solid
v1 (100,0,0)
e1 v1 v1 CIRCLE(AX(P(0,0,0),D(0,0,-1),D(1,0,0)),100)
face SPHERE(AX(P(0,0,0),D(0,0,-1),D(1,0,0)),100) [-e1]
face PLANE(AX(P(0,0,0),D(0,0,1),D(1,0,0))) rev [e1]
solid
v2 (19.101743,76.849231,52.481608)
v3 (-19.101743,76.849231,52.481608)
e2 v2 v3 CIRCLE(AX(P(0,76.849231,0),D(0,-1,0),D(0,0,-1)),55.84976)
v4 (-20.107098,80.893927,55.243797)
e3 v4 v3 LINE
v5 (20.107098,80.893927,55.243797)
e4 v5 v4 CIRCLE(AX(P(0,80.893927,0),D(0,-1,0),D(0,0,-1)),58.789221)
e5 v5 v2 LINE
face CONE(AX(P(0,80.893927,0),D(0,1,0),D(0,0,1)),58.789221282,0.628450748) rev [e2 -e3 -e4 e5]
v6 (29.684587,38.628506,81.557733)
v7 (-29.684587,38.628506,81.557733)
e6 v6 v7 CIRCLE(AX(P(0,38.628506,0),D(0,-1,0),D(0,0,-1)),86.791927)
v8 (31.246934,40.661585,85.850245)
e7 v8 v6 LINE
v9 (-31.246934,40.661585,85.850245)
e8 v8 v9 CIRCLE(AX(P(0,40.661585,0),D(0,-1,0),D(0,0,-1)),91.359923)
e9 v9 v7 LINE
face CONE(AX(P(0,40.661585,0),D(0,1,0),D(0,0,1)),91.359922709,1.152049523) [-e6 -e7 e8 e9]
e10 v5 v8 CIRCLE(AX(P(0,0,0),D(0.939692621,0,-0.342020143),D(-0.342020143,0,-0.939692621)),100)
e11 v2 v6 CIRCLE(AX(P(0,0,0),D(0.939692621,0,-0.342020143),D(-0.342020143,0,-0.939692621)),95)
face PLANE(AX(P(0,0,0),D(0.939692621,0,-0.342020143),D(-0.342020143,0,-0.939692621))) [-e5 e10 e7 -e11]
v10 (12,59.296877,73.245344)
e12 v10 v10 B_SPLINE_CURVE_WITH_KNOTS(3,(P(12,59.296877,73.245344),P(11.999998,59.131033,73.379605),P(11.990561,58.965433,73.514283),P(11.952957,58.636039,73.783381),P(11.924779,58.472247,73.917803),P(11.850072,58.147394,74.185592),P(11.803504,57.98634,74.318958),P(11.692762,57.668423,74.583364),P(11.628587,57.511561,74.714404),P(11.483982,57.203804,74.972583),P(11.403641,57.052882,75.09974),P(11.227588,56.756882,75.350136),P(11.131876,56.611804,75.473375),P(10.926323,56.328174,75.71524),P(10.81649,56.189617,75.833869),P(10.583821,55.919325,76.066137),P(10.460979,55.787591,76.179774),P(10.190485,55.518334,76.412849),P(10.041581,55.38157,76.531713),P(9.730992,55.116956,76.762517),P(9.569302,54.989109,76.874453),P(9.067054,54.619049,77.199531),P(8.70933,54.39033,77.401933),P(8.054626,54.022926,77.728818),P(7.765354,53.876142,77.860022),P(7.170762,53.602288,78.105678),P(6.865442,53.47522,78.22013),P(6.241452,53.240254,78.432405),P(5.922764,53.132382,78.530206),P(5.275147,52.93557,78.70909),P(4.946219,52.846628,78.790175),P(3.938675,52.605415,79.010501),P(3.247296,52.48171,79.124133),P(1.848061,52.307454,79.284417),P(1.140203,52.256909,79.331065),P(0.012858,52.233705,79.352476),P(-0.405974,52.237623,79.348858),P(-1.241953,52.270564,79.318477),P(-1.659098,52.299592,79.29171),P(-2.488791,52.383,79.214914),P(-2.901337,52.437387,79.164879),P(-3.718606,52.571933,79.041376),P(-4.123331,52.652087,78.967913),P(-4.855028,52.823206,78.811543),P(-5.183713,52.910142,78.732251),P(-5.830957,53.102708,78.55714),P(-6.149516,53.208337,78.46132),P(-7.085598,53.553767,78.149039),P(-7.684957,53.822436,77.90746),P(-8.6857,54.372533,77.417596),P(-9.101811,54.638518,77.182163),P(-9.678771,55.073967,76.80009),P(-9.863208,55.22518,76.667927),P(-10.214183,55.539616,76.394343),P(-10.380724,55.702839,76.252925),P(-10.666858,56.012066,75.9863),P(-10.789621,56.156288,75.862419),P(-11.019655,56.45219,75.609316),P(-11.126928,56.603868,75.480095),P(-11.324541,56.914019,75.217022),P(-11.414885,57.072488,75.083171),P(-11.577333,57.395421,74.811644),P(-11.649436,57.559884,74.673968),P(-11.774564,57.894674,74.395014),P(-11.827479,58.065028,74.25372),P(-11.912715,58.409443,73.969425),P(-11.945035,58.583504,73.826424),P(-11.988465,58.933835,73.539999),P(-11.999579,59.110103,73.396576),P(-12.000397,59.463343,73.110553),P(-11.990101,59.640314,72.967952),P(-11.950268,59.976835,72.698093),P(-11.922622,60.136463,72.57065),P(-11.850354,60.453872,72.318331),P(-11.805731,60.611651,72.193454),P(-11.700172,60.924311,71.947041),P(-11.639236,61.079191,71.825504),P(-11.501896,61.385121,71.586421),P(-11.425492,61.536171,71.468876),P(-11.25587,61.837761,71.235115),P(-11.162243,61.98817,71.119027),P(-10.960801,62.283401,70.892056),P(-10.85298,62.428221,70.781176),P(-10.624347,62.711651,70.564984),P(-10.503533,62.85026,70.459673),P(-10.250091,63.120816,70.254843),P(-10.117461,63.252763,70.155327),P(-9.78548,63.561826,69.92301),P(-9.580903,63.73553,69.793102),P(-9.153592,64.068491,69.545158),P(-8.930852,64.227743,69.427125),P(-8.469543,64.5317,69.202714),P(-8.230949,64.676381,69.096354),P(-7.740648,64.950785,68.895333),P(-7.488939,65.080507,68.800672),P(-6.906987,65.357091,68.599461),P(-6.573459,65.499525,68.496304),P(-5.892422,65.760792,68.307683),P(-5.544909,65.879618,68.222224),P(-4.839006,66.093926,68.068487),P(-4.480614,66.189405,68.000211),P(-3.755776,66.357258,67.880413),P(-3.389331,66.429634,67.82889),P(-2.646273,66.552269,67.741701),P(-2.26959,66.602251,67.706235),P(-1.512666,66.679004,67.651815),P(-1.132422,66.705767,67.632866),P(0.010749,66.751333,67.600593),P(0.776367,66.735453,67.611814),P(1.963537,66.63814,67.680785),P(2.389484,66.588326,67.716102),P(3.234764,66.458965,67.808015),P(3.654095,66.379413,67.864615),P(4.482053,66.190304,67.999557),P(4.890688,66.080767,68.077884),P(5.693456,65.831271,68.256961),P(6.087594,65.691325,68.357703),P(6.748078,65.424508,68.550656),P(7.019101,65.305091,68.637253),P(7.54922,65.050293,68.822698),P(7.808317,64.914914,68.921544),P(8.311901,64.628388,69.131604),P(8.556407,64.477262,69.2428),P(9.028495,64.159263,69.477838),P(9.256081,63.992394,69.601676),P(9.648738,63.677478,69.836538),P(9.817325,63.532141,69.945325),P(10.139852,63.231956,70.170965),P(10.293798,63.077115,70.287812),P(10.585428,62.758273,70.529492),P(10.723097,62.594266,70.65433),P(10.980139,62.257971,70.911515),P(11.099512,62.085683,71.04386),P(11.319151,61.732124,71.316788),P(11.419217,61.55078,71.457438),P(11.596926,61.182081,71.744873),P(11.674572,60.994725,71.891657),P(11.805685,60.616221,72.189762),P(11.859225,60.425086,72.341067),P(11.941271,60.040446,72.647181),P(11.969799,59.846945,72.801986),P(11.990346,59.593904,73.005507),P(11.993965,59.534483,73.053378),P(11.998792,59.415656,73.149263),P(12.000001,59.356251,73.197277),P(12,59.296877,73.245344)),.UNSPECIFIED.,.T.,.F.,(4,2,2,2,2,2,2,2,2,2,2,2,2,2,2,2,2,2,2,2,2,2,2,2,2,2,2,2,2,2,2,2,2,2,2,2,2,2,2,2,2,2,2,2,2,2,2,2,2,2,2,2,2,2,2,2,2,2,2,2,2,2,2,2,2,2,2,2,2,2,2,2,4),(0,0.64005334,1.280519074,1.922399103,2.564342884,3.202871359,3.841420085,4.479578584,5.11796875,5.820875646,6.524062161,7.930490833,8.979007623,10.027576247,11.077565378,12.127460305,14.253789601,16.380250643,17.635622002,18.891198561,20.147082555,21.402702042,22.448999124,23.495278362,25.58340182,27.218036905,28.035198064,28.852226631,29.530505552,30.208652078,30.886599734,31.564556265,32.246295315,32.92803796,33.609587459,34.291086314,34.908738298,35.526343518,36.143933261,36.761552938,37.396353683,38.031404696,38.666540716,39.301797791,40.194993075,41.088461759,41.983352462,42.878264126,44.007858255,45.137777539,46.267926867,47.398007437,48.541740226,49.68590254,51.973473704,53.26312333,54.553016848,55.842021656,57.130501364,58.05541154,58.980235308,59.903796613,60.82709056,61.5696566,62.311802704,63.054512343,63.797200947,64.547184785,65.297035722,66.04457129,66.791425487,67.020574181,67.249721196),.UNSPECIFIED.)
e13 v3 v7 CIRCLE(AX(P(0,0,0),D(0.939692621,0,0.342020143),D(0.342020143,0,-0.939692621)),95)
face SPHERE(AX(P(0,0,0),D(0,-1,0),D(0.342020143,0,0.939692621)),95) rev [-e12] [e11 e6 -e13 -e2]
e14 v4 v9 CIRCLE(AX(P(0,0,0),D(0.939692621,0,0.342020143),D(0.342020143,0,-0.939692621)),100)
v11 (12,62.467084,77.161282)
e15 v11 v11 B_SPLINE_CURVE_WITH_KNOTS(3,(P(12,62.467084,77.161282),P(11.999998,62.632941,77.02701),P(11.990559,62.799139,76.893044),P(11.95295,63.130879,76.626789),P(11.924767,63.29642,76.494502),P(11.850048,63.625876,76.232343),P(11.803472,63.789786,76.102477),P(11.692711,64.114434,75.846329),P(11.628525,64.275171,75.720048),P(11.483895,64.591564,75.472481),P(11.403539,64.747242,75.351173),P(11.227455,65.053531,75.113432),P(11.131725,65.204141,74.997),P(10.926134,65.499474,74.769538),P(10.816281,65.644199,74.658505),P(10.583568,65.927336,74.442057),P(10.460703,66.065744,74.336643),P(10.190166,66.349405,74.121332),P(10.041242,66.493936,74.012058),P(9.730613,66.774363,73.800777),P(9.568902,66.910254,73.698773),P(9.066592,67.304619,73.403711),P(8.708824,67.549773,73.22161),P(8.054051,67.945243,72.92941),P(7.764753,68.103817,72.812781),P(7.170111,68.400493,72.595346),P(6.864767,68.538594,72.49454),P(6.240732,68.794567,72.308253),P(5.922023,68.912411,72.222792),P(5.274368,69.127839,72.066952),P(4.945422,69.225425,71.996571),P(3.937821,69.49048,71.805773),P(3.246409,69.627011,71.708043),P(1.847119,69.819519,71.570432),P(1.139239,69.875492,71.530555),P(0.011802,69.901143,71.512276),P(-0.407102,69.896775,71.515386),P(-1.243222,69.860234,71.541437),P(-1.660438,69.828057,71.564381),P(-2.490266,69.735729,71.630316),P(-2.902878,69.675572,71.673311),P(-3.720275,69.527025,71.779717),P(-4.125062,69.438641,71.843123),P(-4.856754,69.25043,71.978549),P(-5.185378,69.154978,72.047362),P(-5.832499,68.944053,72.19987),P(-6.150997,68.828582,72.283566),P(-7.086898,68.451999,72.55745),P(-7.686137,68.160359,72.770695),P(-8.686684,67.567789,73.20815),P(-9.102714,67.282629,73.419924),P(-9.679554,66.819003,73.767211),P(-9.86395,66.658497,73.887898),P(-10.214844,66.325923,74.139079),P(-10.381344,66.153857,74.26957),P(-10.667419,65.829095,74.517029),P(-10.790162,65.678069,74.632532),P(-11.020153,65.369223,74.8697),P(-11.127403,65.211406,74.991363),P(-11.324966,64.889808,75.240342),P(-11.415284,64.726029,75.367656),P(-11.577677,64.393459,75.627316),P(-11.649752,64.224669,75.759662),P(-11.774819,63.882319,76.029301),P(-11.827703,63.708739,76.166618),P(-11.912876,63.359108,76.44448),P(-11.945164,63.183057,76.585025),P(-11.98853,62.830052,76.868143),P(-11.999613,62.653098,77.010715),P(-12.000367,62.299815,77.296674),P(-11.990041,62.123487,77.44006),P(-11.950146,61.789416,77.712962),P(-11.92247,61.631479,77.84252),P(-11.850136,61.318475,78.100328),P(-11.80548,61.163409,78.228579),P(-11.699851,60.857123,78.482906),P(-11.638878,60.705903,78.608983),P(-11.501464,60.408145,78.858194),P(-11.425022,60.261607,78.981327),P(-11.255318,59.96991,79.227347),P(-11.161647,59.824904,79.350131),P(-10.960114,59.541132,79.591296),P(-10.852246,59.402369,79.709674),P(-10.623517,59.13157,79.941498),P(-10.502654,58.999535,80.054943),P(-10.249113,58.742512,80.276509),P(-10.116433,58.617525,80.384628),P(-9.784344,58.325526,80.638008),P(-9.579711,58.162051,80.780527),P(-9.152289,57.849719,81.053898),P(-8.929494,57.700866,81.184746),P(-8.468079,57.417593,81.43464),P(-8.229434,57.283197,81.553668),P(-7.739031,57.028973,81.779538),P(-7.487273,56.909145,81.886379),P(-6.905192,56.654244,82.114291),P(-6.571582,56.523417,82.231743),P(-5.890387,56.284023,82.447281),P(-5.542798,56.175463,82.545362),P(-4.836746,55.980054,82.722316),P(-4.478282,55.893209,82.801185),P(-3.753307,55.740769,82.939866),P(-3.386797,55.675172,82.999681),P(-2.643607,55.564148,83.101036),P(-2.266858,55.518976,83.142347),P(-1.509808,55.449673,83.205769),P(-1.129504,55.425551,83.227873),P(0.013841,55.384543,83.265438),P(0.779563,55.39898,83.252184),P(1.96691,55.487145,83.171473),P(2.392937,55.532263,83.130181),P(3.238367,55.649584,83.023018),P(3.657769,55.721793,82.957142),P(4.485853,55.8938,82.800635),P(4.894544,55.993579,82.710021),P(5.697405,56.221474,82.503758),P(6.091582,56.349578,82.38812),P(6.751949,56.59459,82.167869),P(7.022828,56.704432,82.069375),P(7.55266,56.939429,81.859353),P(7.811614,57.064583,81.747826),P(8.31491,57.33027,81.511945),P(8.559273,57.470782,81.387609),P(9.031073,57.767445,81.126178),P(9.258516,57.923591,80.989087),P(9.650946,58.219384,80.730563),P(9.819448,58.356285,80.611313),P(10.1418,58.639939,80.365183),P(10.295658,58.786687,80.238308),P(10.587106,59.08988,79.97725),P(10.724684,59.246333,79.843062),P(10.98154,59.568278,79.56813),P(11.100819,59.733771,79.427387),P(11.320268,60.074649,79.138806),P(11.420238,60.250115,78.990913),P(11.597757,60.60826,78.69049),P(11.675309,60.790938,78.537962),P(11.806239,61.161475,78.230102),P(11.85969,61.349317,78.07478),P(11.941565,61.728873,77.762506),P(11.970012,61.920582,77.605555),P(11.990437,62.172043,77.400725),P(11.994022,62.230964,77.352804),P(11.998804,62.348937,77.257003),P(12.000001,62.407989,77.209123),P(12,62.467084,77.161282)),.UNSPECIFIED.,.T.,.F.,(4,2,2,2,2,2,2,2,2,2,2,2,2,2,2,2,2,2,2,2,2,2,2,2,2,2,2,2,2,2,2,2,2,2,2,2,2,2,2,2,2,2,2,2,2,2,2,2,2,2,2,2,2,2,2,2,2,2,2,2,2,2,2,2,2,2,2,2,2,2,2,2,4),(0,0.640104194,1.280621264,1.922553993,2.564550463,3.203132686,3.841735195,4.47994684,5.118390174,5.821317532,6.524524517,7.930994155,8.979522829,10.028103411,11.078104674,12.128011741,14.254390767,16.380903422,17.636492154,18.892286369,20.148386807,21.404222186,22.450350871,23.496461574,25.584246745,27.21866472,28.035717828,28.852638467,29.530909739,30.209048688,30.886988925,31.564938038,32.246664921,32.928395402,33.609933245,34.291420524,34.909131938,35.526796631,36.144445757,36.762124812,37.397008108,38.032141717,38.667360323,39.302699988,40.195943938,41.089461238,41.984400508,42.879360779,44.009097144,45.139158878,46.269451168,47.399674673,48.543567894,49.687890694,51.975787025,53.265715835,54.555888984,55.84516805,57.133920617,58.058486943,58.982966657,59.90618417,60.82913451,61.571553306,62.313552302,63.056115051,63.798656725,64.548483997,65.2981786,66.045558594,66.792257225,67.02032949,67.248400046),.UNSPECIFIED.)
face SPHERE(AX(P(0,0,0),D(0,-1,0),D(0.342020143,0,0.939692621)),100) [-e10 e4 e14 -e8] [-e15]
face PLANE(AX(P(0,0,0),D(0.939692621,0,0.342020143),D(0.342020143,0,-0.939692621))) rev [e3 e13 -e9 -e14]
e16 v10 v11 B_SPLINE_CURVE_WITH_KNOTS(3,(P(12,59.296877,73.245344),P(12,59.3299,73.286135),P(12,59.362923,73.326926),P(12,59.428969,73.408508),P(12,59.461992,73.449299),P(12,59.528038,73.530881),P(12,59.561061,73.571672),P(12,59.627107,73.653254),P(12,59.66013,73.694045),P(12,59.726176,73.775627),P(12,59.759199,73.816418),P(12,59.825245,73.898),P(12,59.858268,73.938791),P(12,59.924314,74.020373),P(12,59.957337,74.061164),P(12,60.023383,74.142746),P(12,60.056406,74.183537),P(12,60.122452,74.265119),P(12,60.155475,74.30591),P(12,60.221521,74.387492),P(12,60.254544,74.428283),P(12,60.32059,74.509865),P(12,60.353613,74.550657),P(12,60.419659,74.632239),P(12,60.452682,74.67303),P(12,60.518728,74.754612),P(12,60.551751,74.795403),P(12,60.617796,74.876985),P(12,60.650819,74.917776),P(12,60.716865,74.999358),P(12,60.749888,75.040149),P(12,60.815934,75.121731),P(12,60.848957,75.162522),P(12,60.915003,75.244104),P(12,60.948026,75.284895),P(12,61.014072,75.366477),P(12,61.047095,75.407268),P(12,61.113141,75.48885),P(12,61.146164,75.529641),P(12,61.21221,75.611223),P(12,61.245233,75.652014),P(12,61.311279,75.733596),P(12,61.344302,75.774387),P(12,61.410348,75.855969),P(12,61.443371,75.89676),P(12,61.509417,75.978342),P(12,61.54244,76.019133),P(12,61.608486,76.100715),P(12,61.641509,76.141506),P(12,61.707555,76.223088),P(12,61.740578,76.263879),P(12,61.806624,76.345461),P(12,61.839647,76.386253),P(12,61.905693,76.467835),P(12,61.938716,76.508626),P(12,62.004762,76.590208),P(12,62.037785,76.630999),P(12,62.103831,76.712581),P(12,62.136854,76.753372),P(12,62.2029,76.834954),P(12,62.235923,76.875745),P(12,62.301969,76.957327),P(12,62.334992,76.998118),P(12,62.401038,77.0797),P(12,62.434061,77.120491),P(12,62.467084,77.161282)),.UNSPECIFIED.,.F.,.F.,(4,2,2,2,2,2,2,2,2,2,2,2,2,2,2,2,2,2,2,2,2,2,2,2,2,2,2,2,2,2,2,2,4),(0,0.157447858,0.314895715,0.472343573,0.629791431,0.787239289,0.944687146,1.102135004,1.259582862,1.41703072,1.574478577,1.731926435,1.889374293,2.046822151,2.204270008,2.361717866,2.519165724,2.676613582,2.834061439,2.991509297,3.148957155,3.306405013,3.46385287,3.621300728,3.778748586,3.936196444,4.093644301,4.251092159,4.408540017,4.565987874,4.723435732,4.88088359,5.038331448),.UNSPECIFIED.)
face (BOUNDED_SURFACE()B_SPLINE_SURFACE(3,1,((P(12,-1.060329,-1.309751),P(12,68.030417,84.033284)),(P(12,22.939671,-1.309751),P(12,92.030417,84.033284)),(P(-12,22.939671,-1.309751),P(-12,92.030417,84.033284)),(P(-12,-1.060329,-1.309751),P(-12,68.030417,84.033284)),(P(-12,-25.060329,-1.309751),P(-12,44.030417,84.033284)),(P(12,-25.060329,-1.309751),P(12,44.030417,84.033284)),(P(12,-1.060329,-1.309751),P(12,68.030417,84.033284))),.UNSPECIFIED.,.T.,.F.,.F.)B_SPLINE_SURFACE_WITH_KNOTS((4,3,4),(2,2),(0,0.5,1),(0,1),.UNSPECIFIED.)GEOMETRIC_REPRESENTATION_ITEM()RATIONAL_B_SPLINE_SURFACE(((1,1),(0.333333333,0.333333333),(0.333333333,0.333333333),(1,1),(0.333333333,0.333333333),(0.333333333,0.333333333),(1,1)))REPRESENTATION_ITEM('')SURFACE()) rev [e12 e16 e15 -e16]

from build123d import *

# Parameters (mm, degrees)
REVOLVE_2_ANGLE           = 180
REVOLVE_3_ANGLE           = 20
REVOLVE_3_OTHER_WAY_ANGLE = 20
SWEEP_START               = 94.23905762
SWEEP_1_DEPTH             = 5.76094238


# Read off the part's stored shape, not the designer's step: Вырез-По траектории1
with BuildPart() as part:
    # Эскиз1 → Повернуть2 (revolve)
    with BuildSketch(Plane.XY):
        with BuildLine():
            Line((0, 100), (0, -100))
            ThreePointArc((0, -100), (100, 0), (0, 100))
        make_face()
    revolve(axis=Axis((0, 100, 0), (0, -1, 0)), revolution_arc=REVOLVE_2_ANGLE)


with BuildPart() as body_2:
    # Эскиз2 → Повернуть3 (revolve)
    with BuildSketch(Plane(origin=(0, 0, 0), x_dir=(0, 0, -1), z_dir=(1, 0, 0))):
        with BuildLine():
            Line((-91.359922709, 40.661585344), (-86.791926573, 38.628506077))
            ThreePointArc((-86.791926573, 38.628506077), (-73.836770334, 59.775675209), (-55.849760218, 76.849230859))
            Line((-55.849760218, 76.849230859), (-58.789221282, 80.89392722))
            ThreePointArc((-58.789221282, 80.89392722), (-77.722916141, 62.921763377), (-91.359922709, 40.661585344))
        make_face()
    revolve(axis=Axis((0, 0, 0), (0, 1, 0)), revolution_arc=REVOLVE_3_ANGLE)

    # Эскиз2 → Повернуть3 other way (revolve)
    with BuildSketch(Plane(origin=(0, 0, 0), x_dir=(0, 0, -1), z_dir=(1, 0, 0))):
        with BuildLine():
            Line((-91.359922709, 40.661585344), (-86.791926573, 38.628506077))
            ThreePointArc((-86.791926573, 38.628506077), (-73.836770334, 59.775675209), (-55.849760218, 76.849230859))
            Line((-55.849760218, 76.849230859), (-58.789221282, 80.89392722))
            ThreePointArc((-58.789221282, 80.89392722), (-77.722916141, 62.921763377), (-91.359922709, 40.661585344))
        make_face()
    revolve(axis=Axis((0, 0, 0), (0, -1, 0)), revolution_arc=REVOLVE_3_OTHER_WAY_ANGLE)

    # Вырез-По траектории1 outline → Вырез-По траектории1 (cut)
    with BuildSketch(Plane(origin=(0, 0, 0), x_dir=(1, 0, 0), z_dir=(0, 0.6292176337744182, 0.7772291614107913)).offset(SWEEP_START)):
        with BuildLine():
            add(Edge.make_bspline(
                [(12, 0), (12, 18.653499874), (-12, 18.653499874), (-12, 0), (-12, -18.653499874), (12, -18.653499874), (12, 0)],
                knots=[0, 0, 0, 0, 0.5, 0.5, 0.5, 1, 1, 1, 1], degree=3, weights=[1, 0.333333333, 0.333333333, 1, 0.333333333, 0.333333333, 1]))
        make_face()
    extrude(amount=SWEEP_1_DEPTH, mode=Mode.SUBTRACT)


solid = Compound([part.part, body_2.part])
